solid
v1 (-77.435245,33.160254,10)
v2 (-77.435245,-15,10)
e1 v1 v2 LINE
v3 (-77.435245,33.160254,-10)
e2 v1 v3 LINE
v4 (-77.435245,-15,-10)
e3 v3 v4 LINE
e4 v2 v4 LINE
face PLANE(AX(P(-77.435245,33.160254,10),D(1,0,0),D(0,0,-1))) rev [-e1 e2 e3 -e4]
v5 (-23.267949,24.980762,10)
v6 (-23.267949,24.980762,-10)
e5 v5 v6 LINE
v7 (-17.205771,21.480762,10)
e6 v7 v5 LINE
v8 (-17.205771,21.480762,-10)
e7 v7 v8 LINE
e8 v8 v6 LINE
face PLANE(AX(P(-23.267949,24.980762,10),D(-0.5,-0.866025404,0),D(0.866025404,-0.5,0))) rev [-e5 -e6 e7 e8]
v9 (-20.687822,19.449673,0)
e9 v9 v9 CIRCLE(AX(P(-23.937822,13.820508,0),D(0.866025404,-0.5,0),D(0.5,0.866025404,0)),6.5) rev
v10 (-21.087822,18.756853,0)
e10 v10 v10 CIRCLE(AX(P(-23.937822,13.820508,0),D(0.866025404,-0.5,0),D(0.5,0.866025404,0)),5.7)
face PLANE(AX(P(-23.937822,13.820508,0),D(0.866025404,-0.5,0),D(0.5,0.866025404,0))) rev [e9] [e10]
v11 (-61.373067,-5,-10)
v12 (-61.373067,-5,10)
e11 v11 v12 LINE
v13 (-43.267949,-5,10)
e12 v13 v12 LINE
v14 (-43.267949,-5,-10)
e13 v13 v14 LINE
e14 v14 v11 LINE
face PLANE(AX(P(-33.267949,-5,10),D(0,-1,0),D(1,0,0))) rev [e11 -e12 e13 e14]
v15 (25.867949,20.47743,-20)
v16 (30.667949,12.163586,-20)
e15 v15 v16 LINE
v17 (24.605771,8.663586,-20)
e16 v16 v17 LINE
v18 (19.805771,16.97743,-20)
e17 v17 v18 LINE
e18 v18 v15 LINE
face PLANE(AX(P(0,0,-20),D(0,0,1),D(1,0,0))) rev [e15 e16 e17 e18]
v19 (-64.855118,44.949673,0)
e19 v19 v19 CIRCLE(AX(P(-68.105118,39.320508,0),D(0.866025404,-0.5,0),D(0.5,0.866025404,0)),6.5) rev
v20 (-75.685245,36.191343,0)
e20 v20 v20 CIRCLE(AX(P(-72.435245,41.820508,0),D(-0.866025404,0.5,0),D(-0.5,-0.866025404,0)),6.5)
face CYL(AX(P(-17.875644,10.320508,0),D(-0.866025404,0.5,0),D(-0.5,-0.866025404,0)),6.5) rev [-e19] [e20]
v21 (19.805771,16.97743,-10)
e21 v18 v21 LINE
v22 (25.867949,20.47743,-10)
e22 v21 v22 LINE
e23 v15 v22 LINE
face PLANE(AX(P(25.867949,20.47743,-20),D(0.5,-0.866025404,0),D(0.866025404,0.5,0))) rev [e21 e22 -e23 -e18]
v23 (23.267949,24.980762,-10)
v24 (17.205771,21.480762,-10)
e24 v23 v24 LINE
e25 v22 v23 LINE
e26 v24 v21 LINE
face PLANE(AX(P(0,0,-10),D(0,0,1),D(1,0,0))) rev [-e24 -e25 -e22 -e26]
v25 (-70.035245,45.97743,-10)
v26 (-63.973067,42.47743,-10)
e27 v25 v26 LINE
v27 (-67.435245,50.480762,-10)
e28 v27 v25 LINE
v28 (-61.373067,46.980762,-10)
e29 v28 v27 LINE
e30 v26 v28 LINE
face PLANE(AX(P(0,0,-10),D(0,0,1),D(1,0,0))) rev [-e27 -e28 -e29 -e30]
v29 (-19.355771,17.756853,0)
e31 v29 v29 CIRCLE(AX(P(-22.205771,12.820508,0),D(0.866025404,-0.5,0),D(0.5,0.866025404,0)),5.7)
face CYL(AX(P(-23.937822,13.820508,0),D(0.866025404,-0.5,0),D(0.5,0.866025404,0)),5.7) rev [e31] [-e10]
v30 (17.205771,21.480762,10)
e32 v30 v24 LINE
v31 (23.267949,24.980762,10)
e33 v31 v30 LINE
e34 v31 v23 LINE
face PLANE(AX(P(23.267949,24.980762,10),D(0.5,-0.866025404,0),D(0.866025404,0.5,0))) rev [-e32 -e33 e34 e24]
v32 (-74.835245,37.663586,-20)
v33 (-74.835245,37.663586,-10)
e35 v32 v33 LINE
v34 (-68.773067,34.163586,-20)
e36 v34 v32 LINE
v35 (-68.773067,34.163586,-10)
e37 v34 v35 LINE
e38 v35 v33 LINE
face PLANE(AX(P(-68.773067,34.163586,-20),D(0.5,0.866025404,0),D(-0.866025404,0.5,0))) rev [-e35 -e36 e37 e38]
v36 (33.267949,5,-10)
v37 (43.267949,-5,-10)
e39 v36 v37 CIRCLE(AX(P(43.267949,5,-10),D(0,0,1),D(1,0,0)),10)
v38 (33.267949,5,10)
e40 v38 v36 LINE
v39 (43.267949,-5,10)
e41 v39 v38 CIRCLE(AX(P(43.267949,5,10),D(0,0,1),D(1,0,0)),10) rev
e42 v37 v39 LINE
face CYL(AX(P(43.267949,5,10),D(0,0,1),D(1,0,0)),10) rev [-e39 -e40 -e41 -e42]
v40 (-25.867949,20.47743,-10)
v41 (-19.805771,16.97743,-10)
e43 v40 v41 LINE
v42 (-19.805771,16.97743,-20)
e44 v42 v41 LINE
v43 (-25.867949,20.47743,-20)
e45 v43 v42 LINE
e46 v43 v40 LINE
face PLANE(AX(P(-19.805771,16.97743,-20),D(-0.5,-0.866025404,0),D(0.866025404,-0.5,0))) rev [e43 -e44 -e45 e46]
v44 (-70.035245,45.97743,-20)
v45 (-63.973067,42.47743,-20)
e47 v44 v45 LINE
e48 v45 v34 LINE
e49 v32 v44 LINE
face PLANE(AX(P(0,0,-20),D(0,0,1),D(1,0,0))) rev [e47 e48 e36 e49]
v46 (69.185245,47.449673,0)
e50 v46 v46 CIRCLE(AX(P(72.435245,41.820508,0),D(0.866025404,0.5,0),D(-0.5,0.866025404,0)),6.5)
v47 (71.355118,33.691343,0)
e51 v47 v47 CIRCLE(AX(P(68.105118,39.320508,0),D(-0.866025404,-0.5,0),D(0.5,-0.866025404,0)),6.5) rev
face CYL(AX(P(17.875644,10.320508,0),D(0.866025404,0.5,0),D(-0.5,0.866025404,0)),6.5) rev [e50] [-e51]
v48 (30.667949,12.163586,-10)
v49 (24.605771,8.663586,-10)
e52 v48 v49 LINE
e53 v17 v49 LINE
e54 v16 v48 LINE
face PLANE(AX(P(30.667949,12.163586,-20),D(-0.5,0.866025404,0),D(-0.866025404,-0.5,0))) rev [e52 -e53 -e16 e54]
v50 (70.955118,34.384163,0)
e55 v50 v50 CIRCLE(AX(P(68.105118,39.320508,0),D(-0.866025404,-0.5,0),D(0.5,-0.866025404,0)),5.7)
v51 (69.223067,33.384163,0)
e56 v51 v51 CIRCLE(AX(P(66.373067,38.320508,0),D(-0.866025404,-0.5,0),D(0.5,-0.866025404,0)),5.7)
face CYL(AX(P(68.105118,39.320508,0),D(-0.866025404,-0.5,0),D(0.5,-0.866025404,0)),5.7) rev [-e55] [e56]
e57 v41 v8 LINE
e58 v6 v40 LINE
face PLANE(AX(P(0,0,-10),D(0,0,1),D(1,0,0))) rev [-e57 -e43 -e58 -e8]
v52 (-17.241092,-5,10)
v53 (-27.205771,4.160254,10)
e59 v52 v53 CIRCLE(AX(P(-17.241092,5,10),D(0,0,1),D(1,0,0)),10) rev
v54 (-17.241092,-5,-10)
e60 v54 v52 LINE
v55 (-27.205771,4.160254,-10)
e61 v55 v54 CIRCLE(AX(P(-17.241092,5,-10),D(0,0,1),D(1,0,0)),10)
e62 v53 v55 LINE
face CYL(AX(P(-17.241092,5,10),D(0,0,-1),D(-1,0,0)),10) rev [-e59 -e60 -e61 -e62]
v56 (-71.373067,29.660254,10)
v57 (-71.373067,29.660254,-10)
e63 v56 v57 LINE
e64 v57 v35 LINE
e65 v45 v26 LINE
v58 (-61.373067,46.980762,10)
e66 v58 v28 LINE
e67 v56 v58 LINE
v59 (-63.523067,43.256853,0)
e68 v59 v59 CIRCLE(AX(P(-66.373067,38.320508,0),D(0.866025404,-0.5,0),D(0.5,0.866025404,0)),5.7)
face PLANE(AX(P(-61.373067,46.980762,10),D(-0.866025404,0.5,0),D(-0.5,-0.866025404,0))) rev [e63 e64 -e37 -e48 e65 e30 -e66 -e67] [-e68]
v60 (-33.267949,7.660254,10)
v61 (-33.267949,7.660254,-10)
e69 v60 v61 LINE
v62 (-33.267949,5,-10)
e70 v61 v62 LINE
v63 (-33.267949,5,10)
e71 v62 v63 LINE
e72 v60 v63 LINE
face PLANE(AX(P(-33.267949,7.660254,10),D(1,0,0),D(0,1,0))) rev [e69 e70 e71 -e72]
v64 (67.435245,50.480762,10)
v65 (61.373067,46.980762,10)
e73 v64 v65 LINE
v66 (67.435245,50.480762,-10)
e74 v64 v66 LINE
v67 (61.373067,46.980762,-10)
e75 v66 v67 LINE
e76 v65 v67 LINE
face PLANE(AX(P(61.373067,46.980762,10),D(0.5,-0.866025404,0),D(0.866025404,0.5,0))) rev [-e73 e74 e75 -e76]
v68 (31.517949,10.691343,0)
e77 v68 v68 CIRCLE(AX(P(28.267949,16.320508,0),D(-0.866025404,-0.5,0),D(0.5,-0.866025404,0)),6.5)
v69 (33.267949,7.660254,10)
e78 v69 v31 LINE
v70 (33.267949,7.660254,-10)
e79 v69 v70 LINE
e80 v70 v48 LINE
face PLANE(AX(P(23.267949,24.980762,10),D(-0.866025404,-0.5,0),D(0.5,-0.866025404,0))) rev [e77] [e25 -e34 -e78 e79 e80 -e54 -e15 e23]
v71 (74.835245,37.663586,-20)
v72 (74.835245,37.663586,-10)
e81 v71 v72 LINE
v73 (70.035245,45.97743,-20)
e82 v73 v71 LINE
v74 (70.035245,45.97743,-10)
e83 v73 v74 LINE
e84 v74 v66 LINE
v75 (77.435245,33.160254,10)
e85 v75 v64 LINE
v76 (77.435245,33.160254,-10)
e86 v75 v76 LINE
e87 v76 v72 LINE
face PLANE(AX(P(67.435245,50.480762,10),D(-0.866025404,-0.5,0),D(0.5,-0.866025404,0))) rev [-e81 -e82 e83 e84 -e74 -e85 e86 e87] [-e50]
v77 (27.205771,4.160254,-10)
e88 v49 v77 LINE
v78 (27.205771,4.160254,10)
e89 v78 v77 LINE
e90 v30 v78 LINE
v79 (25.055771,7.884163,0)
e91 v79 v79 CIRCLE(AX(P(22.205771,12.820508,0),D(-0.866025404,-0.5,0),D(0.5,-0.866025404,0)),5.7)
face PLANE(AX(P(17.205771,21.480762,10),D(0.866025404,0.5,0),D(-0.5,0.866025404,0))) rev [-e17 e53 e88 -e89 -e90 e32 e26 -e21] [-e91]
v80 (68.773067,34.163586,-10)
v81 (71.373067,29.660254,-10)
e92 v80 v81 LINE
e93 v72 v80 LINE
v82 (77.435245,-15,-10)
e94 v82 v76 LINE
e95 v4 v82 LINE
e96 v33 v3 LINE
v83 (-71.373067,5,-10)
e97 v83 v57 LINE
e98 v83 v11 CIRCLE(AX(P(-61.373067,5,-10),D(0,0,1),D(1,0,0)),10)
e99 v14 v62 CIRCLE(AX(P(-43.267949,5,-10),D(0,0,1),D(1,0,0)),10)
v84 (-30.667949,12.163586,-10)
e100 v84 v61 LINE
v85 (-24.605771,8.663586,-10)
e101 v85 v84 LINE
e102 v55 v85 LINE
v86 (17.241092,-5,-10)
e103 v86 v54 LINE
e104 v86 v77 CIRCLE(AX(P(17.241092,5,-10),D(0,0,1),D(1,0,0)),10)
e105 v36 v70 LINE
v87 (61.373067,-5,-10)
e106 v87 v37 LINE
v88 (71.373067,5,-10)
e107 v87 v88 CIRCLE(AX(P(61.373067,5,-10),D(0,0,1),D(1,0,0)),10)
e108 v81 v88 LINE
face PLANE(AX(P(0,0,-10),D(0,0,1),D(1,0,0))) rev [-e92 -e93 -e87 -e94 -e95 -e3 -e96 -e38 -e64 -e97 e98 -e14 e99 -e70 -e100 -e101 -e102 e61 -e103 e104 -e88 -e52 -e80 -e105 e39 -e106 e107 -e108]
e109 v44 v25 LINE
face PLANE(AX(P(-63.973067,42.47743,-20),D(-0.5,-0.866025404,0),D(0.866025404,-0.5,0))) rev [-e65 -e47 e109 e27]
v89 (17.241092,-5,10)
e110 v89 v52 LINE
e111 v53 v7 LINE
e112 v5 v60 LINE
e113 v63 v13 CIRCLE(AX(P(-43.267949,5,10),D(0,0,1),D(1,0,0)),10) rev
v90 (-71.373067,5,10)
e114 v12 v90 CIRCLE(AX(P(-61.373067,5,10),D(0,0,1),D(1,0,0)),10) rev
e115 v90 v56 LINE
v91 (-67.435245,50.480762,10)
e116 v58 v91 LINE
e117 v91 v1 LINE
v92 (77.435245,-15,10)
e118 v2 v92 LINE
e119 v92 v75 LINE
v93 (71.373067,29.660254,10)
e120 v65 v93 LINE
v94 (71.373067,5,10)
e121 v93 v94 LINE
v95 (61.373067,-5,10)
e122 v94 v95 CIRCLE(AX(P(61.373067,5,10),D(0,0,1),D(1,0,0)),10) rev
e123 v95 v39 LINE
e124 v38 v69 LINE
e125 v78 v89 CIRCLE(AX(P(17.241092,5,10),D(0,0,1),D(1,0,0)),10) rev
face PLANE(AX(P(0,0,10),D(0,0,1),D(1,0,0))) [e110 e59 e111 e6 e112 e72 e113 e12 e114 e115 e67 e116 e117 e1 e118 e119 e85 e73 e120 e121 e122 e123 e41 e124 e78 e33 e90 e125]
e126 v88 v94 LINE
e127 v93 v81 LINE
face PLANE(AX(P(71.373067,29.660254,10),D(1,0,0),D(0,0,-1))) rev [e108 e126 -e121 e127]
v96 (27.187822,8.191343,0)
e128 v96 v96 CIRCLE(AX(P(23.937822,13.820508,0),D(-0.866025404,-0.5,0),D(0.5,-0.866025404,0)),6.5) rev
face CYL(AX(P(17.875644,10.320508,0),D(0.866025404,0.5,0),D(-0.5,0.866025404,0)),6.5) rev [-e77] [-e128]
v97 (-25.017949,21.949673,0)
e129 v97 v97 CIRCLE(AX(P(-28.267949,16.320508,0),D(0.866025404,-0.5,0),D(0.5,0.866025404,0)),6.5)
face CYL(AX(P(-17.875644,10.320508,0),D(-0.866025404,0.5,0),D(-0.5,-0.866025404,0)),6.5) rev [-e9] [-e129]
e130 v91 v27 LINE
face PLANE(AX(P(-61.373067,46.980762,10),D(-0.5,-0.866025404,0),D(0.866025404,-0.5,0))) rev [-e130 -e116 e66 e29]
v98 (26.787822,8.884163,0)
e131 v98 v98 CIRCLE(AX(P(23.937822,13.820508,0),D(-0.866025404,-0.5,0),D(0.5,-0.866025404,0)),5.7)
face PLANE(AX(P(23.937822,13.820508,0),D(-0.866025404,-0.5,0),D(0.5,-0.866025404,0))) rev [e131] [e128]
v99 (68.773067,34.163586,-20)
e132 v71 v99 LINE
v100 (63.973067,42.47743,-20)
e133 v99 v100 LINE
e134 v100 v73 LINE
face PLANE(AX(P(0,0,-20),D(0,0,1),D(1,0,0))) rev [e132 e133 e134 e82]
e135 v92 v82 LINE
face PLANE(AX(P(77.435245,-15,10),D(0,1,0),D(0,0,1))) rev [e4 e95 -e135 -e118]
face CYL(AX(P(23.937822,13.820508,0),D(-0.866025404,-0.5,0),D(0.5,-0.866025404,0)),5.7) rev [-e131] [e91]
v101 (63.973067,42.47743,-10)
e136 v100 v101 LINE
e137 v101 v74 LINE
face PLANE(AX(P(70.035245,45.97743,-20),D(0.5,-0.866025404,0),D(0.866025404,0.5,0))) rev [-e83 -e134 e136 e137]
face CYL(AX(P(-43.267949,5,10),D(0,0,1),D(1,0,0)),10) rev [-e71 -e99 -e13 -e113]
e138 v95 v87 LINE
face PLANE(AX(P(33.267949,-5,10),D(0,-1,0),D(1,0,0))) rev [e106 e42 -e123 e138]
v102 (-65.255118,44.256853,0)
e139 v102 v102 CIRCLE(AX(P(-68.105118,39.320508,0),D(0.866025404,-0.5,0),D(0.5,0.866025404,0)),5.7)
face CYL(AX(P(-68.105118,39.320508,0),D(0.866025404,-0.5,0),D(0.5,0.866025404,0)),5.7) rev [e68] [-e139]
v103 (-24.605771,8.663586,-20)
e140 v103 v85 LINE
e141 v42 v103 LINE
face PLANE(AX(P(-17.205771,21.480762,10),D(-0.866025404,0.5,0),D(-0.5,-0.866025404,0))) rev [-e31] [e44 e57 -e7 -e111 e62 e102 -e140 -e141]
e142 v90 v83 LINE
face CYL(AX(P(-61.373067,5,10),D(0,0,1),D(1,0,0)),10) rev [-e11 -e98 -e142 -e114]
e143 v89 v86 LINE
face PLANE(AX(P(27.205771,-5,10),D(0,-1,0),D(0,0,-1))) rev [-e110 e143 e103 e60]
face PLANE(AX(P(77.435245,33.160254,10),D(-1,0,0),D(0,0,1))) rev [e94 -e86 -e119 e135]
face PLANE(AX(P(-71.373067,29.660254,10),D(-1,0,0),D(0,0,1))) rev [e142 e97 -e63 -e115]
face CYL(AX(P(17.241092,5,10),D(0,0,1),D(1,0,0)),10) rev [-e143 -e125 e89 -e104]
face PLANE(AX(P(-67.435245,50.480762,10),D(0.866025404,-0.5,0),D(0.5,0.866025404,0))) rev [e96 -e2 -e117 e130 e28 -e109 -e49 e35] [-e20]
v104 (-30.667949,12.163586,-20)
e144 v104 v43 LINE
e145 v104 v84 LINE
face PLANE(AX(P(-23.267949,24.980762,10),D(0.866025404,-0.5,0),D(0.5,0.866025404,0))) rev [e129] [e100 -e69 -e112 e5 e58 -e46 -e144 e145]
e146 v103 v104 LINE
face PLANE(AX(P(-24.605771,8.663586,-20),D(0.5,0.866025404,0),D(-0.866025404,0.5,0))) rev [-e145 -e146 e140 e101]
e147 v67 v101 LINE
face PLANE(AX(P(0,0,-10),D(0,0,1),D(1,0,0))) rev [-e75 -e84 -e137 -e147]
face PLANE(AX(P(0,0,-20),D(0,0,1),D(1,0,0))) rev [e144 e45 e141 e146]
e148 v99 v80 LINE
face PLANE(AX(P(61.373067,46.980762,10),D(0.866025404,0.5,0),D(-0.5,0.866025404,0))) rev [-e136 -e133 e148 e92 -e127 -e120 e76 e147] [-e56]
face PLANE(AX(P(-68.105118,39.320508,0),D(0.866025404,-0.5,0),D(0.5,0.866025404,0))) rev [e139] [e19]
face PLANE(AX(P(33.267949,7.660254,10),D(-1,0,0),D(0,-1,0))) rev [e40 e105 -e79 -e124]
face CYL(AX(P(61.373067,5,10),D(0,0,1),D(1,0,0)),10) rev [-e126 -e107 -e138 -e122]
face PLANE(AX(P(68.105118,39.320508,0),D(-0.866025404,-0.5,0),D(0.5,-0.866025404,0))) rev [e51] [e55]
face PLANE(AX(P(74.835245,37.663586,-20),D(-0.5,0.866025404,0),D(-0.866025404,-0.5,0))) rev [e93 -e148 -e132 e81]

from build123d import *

# Parameters (mm, degrees)
BOSS_EXTRU_1_DEPTH      = 10
ESQUISSE2_R             = 6.5
ENL_V_MAT_EXTRU_1_DEPTH = 63
ESQUISSE3_R             = 6.5
ENL_V_MAT_EXTRU_2_DEPTH = 63
CONG_1_R                = 10
CONG_2_R                = 10
BOSS_EXTRU_2_START      = -2
ESQUISSE4_R             = 6.5
ESQUISSE4_R_2           = 5.7
BOSS_EXTRU_2_DEPTH      = 2
BOSS_EXTRU_3_START      = -2
ESQUISSE5_R             = 6.5
ESQUISSE5_R_2           = 5.7
BOSS_EXTRU_3_DEPTH      = 2
BOSS_EXTRU_4_START      = -2
ESQUISSE6_R             = 6.5
ESQUISSE6_R_2           = 5.7
BOSS_EXTRU_4_DEPTH      = 2
BOSS_EXTRU_5_START      = -2
ESQUISSE7_R             = 6.5
ESQUISSE7_R_2           = 5.7
BOSS_EXTRU_5_DEPTH      = 2
BOSS_EXTRU_6_DEPTH      = 10


with BuildPart() as part:
    # Esquisse1 → Boss.-Extru.1 (new, symmetric)
    with BuildSketch(Plane.XY):
        Polygon((23.267949192, 24.980762114), (33.267949192, 7.660254038), (33.267949192, -5), (71.373066959, -5), (71.373066959, 29.660254038), (61.373066959, 46.980762114), (67.435244785, 50.480762114), (77.435244785, 33.160254038), (77.435244785, -15), (71.373066959, -15), (-71.373066959, -15), (-77.435244785, -15), (-77.435244785, 33.160254038), (-67.435244785, 50.480762114), (-61.373066959, 46.980762114), (-71.373066959, 29.660254038), (-71.373066959, -5), (-33.267949192, -5), (-33.267949192, 7.660254038), (-23.267949192, 24.980762114), (-17.205771366, 21.480762114), (-27.205771366, 4.160254038), (-27.205771366, -5), (27.205771366, -5), (27.205771366, 4.160254038), (17.205771366, 21.480762114), align=None)
    extrude(amount=BOSS_EXTRU_1_DEPTH, both=True)

    # Esquisse2 → Enlèv. mat.-Extru.1 (cut)
    with BuildSketch(Plane(origin=(-72.435244785, 41.820508076, 0), x_dir=(0, 0, 1), z_dir=(-0.8660254037844399, 0.4999999999999977, 0))):
        with Locations(Location((0, 0, 0), (0, 0, 270))):
            Circle(ESQUISSE2_R)
    extrude(amount=-ENL_V_MAT_EXTRU_1_DEPTH, mode=Mode.SUBTRACT)

    # Esquisse3 → Enlèv. mat.-Extru.2 (cut)
    with BuildSketch(Plane(origin=(72.435244785, 41.820508076, 0), x_dir=(0, 0, -1), z_dir=(0.86602540378444, 0.4999999999999975, 0))):
        with Locations(Location((0, 0, 0), (0, 0, 90))):
            Circle(ESQUISSE3_R)
    extrude(amount=-ENL_V_MAT_EXTRU_2_DEPTH, mode=Mode.SUBTRACT)

    # Congé1
    cong_1_edges = [part.edges().sort_by_distance(p)[0] for p in [
        (33.267949192, -5, 0),
        (71.373066959, -5, 0),
        (-71.373066959, -5, 0),
        (-33.267949192, -5, 0),
    ]]
    fillet(cong_1_edges, radius=CONG_1_R)

    # Congé2
    # the kernel refuses this fillet: 10 mm, written as the material it adds along each edge
    with BuildSketch(Plane(origin=(-27.205771366, -5, 10), x_dir=(1, 0, 0), z_dir=(0, 0, -1))) as cong_2_piece_1:
        with BuildLine():
            CenterArc((9.964678957, -10), CONG_2_R, 90, 85.182937258)
            Line((0, -9.160254038), (-0.199293579, -9.143459119))
            ThreePointArc((-0.199293579, -9.143459119), (-0.2, -4.580127019), (-0.2, 0))
            Line((-0.2, 0), (0, 0.2))
            Line((0, 0.2), (9.964678957, 0.2))
            Line((9.964678957, 0.2), (9.964678957, 0))
        make_face()
    extrude(amount=20)
    with BuildSketch(Plane(origin=(27.205771366, -5, 10), x_dir=(0, 1, 0), z_dir=(0, 0, -1))) as cong_2_piece_2:
        with BuildLine():
            CenterArc((10, -9.964678957), CONG_2_R, 94.817062742, 85.182937258)
            Line((0, -9.964678957), (-0.2, -9.964678957))
            Line((-0.2, -9.964678957), (-0.2, 0))
            Line((-0.2, 0), (0, 0.2))
            ThreePointArc((0, 0.2), (4.580127019, 0.2), (9.143459119, 0.199293579))
            Line((9.143459119, 0.199293579), (9.160254038, 0))
        make_face()
    extrude(amount=20)

    # Esquisse4 → Boss.-Extru.2 (add)
    with BuildSketch(Plane(origin=(-22.205771366, 12.820508076, 0), x_dir=(0, 0, -1), z_dir=(0.8660254037844398, -0.49999999999999817, 0)).offset(BOSS_EXTRU_2_START)):
        with Locations(Location((0, 0, 0), (0, 0, 90))):
            Circle(ESQUISSE4_R)
        with Locations(Location((0, 0, 0), (0, 0, 90))):
            Circle(ESQUISSE4_R_2, mode=Mode.SUBTRACT)
    extrude(amount=BOSS_EXTRU_2_DEPTH)

    # Esquisse5 → Boss.-Extru.3 (add)
    with BuildSketch(Plane(origin=(-66.373066959, 38.320508076, 0), x_dir=(0, 0, -1), z_dir=(0.8660254037844398, -0.49999999999999817, 0)).offset(BOSS_EXTRU_3_START)):
        with Locations(Location((0, 0, 0), (0, 0, 270))):
            Circle(ESQUISSE5_R)
        with Locations(Location((0, 0, 0), (0, 0, 90))):
            Circle(ESQUISSE5_R_2, mode=Mode.SUBTRACT)
    extrude(amount=BOSS_EXTRU_3_DEPTH)

    # Esquisse6 → Boss.-Extru.4 (add)
    with BuildSketch(Plane(origin=(22.205771366, 12.820508076, 0), x_dir=(0, 0, 1), z_dir=(-0.8660254037844398, -0.49999999999999817, 0)).offset(BOSS_EXTRU_4_START)):
        with Locations(Location((0, 0, 0), (0, 0, 270))):
            Circle(ESQUISSE6_R)
        with Locations(Location((0, 0, 0), (0, 0, 270))):
            Circle(ESQUISSE6_R_2, mode=Mode.SUBTRACT)
    extrude(amount=BOSS_EXTRU_4_DEPTH)

    # Esquisse7 → Boss.-Extru.5 (add)
    with BuildSketch(Plane(origin=(66.373066959, 38.320508076, 0), x_dir=(0, 0, 1), z_dir=(-0.8660254037844398, -0.49999999999999817, 0)).offset(BOSS_EXTRU_5_START)):
        with Locations(Location((0, 0, 0), (0, 0, 90))):
            Circle(ESQUISSE7_R)
        with Locations(Location((0, 0, 0), (0, 0, 270))):
            Circle(ESQUISSE7_R_2, mode=Mode.SUBTRACT)
    extrude(amount=BOSS_EXTRU_5_DEPTH)

    # Esquisse8 → Boss.-Extru.6 (add)
    with BuildSketch(Plane(origin=(0, 0, -10), x_dir=(-1, 0, 0), z_dir=(0, 0, -1))):
        Polygon((63.973066959, 42.477430014), (70.035244785, 45.977430014), (74.835244785, 37.663586138), (68.773066959, 34.163586138), align=None)
        Polygon((19.805771366, 16.977430014), (25.867949192, 20.477430014), (30.667949192, 12.163586138), (24.605771366, 8.663586138), align=None)
        Polygon((-25.867949192, 20.477430014), (-19.805771366, 16.977430014), (-24.605771366, 8.663586138), (-30.667949192, 12.163586138), align=None)
        Polygon((-70.035244785, 45.977430014), (-63.973066959, 42.477430014), (-68.773066959, 34.163586138), (-74.835244785, 37.663586138), align=None)
    extrude(amount=BOSS_EXTRU_6_DEPTH)


solid = part.part
